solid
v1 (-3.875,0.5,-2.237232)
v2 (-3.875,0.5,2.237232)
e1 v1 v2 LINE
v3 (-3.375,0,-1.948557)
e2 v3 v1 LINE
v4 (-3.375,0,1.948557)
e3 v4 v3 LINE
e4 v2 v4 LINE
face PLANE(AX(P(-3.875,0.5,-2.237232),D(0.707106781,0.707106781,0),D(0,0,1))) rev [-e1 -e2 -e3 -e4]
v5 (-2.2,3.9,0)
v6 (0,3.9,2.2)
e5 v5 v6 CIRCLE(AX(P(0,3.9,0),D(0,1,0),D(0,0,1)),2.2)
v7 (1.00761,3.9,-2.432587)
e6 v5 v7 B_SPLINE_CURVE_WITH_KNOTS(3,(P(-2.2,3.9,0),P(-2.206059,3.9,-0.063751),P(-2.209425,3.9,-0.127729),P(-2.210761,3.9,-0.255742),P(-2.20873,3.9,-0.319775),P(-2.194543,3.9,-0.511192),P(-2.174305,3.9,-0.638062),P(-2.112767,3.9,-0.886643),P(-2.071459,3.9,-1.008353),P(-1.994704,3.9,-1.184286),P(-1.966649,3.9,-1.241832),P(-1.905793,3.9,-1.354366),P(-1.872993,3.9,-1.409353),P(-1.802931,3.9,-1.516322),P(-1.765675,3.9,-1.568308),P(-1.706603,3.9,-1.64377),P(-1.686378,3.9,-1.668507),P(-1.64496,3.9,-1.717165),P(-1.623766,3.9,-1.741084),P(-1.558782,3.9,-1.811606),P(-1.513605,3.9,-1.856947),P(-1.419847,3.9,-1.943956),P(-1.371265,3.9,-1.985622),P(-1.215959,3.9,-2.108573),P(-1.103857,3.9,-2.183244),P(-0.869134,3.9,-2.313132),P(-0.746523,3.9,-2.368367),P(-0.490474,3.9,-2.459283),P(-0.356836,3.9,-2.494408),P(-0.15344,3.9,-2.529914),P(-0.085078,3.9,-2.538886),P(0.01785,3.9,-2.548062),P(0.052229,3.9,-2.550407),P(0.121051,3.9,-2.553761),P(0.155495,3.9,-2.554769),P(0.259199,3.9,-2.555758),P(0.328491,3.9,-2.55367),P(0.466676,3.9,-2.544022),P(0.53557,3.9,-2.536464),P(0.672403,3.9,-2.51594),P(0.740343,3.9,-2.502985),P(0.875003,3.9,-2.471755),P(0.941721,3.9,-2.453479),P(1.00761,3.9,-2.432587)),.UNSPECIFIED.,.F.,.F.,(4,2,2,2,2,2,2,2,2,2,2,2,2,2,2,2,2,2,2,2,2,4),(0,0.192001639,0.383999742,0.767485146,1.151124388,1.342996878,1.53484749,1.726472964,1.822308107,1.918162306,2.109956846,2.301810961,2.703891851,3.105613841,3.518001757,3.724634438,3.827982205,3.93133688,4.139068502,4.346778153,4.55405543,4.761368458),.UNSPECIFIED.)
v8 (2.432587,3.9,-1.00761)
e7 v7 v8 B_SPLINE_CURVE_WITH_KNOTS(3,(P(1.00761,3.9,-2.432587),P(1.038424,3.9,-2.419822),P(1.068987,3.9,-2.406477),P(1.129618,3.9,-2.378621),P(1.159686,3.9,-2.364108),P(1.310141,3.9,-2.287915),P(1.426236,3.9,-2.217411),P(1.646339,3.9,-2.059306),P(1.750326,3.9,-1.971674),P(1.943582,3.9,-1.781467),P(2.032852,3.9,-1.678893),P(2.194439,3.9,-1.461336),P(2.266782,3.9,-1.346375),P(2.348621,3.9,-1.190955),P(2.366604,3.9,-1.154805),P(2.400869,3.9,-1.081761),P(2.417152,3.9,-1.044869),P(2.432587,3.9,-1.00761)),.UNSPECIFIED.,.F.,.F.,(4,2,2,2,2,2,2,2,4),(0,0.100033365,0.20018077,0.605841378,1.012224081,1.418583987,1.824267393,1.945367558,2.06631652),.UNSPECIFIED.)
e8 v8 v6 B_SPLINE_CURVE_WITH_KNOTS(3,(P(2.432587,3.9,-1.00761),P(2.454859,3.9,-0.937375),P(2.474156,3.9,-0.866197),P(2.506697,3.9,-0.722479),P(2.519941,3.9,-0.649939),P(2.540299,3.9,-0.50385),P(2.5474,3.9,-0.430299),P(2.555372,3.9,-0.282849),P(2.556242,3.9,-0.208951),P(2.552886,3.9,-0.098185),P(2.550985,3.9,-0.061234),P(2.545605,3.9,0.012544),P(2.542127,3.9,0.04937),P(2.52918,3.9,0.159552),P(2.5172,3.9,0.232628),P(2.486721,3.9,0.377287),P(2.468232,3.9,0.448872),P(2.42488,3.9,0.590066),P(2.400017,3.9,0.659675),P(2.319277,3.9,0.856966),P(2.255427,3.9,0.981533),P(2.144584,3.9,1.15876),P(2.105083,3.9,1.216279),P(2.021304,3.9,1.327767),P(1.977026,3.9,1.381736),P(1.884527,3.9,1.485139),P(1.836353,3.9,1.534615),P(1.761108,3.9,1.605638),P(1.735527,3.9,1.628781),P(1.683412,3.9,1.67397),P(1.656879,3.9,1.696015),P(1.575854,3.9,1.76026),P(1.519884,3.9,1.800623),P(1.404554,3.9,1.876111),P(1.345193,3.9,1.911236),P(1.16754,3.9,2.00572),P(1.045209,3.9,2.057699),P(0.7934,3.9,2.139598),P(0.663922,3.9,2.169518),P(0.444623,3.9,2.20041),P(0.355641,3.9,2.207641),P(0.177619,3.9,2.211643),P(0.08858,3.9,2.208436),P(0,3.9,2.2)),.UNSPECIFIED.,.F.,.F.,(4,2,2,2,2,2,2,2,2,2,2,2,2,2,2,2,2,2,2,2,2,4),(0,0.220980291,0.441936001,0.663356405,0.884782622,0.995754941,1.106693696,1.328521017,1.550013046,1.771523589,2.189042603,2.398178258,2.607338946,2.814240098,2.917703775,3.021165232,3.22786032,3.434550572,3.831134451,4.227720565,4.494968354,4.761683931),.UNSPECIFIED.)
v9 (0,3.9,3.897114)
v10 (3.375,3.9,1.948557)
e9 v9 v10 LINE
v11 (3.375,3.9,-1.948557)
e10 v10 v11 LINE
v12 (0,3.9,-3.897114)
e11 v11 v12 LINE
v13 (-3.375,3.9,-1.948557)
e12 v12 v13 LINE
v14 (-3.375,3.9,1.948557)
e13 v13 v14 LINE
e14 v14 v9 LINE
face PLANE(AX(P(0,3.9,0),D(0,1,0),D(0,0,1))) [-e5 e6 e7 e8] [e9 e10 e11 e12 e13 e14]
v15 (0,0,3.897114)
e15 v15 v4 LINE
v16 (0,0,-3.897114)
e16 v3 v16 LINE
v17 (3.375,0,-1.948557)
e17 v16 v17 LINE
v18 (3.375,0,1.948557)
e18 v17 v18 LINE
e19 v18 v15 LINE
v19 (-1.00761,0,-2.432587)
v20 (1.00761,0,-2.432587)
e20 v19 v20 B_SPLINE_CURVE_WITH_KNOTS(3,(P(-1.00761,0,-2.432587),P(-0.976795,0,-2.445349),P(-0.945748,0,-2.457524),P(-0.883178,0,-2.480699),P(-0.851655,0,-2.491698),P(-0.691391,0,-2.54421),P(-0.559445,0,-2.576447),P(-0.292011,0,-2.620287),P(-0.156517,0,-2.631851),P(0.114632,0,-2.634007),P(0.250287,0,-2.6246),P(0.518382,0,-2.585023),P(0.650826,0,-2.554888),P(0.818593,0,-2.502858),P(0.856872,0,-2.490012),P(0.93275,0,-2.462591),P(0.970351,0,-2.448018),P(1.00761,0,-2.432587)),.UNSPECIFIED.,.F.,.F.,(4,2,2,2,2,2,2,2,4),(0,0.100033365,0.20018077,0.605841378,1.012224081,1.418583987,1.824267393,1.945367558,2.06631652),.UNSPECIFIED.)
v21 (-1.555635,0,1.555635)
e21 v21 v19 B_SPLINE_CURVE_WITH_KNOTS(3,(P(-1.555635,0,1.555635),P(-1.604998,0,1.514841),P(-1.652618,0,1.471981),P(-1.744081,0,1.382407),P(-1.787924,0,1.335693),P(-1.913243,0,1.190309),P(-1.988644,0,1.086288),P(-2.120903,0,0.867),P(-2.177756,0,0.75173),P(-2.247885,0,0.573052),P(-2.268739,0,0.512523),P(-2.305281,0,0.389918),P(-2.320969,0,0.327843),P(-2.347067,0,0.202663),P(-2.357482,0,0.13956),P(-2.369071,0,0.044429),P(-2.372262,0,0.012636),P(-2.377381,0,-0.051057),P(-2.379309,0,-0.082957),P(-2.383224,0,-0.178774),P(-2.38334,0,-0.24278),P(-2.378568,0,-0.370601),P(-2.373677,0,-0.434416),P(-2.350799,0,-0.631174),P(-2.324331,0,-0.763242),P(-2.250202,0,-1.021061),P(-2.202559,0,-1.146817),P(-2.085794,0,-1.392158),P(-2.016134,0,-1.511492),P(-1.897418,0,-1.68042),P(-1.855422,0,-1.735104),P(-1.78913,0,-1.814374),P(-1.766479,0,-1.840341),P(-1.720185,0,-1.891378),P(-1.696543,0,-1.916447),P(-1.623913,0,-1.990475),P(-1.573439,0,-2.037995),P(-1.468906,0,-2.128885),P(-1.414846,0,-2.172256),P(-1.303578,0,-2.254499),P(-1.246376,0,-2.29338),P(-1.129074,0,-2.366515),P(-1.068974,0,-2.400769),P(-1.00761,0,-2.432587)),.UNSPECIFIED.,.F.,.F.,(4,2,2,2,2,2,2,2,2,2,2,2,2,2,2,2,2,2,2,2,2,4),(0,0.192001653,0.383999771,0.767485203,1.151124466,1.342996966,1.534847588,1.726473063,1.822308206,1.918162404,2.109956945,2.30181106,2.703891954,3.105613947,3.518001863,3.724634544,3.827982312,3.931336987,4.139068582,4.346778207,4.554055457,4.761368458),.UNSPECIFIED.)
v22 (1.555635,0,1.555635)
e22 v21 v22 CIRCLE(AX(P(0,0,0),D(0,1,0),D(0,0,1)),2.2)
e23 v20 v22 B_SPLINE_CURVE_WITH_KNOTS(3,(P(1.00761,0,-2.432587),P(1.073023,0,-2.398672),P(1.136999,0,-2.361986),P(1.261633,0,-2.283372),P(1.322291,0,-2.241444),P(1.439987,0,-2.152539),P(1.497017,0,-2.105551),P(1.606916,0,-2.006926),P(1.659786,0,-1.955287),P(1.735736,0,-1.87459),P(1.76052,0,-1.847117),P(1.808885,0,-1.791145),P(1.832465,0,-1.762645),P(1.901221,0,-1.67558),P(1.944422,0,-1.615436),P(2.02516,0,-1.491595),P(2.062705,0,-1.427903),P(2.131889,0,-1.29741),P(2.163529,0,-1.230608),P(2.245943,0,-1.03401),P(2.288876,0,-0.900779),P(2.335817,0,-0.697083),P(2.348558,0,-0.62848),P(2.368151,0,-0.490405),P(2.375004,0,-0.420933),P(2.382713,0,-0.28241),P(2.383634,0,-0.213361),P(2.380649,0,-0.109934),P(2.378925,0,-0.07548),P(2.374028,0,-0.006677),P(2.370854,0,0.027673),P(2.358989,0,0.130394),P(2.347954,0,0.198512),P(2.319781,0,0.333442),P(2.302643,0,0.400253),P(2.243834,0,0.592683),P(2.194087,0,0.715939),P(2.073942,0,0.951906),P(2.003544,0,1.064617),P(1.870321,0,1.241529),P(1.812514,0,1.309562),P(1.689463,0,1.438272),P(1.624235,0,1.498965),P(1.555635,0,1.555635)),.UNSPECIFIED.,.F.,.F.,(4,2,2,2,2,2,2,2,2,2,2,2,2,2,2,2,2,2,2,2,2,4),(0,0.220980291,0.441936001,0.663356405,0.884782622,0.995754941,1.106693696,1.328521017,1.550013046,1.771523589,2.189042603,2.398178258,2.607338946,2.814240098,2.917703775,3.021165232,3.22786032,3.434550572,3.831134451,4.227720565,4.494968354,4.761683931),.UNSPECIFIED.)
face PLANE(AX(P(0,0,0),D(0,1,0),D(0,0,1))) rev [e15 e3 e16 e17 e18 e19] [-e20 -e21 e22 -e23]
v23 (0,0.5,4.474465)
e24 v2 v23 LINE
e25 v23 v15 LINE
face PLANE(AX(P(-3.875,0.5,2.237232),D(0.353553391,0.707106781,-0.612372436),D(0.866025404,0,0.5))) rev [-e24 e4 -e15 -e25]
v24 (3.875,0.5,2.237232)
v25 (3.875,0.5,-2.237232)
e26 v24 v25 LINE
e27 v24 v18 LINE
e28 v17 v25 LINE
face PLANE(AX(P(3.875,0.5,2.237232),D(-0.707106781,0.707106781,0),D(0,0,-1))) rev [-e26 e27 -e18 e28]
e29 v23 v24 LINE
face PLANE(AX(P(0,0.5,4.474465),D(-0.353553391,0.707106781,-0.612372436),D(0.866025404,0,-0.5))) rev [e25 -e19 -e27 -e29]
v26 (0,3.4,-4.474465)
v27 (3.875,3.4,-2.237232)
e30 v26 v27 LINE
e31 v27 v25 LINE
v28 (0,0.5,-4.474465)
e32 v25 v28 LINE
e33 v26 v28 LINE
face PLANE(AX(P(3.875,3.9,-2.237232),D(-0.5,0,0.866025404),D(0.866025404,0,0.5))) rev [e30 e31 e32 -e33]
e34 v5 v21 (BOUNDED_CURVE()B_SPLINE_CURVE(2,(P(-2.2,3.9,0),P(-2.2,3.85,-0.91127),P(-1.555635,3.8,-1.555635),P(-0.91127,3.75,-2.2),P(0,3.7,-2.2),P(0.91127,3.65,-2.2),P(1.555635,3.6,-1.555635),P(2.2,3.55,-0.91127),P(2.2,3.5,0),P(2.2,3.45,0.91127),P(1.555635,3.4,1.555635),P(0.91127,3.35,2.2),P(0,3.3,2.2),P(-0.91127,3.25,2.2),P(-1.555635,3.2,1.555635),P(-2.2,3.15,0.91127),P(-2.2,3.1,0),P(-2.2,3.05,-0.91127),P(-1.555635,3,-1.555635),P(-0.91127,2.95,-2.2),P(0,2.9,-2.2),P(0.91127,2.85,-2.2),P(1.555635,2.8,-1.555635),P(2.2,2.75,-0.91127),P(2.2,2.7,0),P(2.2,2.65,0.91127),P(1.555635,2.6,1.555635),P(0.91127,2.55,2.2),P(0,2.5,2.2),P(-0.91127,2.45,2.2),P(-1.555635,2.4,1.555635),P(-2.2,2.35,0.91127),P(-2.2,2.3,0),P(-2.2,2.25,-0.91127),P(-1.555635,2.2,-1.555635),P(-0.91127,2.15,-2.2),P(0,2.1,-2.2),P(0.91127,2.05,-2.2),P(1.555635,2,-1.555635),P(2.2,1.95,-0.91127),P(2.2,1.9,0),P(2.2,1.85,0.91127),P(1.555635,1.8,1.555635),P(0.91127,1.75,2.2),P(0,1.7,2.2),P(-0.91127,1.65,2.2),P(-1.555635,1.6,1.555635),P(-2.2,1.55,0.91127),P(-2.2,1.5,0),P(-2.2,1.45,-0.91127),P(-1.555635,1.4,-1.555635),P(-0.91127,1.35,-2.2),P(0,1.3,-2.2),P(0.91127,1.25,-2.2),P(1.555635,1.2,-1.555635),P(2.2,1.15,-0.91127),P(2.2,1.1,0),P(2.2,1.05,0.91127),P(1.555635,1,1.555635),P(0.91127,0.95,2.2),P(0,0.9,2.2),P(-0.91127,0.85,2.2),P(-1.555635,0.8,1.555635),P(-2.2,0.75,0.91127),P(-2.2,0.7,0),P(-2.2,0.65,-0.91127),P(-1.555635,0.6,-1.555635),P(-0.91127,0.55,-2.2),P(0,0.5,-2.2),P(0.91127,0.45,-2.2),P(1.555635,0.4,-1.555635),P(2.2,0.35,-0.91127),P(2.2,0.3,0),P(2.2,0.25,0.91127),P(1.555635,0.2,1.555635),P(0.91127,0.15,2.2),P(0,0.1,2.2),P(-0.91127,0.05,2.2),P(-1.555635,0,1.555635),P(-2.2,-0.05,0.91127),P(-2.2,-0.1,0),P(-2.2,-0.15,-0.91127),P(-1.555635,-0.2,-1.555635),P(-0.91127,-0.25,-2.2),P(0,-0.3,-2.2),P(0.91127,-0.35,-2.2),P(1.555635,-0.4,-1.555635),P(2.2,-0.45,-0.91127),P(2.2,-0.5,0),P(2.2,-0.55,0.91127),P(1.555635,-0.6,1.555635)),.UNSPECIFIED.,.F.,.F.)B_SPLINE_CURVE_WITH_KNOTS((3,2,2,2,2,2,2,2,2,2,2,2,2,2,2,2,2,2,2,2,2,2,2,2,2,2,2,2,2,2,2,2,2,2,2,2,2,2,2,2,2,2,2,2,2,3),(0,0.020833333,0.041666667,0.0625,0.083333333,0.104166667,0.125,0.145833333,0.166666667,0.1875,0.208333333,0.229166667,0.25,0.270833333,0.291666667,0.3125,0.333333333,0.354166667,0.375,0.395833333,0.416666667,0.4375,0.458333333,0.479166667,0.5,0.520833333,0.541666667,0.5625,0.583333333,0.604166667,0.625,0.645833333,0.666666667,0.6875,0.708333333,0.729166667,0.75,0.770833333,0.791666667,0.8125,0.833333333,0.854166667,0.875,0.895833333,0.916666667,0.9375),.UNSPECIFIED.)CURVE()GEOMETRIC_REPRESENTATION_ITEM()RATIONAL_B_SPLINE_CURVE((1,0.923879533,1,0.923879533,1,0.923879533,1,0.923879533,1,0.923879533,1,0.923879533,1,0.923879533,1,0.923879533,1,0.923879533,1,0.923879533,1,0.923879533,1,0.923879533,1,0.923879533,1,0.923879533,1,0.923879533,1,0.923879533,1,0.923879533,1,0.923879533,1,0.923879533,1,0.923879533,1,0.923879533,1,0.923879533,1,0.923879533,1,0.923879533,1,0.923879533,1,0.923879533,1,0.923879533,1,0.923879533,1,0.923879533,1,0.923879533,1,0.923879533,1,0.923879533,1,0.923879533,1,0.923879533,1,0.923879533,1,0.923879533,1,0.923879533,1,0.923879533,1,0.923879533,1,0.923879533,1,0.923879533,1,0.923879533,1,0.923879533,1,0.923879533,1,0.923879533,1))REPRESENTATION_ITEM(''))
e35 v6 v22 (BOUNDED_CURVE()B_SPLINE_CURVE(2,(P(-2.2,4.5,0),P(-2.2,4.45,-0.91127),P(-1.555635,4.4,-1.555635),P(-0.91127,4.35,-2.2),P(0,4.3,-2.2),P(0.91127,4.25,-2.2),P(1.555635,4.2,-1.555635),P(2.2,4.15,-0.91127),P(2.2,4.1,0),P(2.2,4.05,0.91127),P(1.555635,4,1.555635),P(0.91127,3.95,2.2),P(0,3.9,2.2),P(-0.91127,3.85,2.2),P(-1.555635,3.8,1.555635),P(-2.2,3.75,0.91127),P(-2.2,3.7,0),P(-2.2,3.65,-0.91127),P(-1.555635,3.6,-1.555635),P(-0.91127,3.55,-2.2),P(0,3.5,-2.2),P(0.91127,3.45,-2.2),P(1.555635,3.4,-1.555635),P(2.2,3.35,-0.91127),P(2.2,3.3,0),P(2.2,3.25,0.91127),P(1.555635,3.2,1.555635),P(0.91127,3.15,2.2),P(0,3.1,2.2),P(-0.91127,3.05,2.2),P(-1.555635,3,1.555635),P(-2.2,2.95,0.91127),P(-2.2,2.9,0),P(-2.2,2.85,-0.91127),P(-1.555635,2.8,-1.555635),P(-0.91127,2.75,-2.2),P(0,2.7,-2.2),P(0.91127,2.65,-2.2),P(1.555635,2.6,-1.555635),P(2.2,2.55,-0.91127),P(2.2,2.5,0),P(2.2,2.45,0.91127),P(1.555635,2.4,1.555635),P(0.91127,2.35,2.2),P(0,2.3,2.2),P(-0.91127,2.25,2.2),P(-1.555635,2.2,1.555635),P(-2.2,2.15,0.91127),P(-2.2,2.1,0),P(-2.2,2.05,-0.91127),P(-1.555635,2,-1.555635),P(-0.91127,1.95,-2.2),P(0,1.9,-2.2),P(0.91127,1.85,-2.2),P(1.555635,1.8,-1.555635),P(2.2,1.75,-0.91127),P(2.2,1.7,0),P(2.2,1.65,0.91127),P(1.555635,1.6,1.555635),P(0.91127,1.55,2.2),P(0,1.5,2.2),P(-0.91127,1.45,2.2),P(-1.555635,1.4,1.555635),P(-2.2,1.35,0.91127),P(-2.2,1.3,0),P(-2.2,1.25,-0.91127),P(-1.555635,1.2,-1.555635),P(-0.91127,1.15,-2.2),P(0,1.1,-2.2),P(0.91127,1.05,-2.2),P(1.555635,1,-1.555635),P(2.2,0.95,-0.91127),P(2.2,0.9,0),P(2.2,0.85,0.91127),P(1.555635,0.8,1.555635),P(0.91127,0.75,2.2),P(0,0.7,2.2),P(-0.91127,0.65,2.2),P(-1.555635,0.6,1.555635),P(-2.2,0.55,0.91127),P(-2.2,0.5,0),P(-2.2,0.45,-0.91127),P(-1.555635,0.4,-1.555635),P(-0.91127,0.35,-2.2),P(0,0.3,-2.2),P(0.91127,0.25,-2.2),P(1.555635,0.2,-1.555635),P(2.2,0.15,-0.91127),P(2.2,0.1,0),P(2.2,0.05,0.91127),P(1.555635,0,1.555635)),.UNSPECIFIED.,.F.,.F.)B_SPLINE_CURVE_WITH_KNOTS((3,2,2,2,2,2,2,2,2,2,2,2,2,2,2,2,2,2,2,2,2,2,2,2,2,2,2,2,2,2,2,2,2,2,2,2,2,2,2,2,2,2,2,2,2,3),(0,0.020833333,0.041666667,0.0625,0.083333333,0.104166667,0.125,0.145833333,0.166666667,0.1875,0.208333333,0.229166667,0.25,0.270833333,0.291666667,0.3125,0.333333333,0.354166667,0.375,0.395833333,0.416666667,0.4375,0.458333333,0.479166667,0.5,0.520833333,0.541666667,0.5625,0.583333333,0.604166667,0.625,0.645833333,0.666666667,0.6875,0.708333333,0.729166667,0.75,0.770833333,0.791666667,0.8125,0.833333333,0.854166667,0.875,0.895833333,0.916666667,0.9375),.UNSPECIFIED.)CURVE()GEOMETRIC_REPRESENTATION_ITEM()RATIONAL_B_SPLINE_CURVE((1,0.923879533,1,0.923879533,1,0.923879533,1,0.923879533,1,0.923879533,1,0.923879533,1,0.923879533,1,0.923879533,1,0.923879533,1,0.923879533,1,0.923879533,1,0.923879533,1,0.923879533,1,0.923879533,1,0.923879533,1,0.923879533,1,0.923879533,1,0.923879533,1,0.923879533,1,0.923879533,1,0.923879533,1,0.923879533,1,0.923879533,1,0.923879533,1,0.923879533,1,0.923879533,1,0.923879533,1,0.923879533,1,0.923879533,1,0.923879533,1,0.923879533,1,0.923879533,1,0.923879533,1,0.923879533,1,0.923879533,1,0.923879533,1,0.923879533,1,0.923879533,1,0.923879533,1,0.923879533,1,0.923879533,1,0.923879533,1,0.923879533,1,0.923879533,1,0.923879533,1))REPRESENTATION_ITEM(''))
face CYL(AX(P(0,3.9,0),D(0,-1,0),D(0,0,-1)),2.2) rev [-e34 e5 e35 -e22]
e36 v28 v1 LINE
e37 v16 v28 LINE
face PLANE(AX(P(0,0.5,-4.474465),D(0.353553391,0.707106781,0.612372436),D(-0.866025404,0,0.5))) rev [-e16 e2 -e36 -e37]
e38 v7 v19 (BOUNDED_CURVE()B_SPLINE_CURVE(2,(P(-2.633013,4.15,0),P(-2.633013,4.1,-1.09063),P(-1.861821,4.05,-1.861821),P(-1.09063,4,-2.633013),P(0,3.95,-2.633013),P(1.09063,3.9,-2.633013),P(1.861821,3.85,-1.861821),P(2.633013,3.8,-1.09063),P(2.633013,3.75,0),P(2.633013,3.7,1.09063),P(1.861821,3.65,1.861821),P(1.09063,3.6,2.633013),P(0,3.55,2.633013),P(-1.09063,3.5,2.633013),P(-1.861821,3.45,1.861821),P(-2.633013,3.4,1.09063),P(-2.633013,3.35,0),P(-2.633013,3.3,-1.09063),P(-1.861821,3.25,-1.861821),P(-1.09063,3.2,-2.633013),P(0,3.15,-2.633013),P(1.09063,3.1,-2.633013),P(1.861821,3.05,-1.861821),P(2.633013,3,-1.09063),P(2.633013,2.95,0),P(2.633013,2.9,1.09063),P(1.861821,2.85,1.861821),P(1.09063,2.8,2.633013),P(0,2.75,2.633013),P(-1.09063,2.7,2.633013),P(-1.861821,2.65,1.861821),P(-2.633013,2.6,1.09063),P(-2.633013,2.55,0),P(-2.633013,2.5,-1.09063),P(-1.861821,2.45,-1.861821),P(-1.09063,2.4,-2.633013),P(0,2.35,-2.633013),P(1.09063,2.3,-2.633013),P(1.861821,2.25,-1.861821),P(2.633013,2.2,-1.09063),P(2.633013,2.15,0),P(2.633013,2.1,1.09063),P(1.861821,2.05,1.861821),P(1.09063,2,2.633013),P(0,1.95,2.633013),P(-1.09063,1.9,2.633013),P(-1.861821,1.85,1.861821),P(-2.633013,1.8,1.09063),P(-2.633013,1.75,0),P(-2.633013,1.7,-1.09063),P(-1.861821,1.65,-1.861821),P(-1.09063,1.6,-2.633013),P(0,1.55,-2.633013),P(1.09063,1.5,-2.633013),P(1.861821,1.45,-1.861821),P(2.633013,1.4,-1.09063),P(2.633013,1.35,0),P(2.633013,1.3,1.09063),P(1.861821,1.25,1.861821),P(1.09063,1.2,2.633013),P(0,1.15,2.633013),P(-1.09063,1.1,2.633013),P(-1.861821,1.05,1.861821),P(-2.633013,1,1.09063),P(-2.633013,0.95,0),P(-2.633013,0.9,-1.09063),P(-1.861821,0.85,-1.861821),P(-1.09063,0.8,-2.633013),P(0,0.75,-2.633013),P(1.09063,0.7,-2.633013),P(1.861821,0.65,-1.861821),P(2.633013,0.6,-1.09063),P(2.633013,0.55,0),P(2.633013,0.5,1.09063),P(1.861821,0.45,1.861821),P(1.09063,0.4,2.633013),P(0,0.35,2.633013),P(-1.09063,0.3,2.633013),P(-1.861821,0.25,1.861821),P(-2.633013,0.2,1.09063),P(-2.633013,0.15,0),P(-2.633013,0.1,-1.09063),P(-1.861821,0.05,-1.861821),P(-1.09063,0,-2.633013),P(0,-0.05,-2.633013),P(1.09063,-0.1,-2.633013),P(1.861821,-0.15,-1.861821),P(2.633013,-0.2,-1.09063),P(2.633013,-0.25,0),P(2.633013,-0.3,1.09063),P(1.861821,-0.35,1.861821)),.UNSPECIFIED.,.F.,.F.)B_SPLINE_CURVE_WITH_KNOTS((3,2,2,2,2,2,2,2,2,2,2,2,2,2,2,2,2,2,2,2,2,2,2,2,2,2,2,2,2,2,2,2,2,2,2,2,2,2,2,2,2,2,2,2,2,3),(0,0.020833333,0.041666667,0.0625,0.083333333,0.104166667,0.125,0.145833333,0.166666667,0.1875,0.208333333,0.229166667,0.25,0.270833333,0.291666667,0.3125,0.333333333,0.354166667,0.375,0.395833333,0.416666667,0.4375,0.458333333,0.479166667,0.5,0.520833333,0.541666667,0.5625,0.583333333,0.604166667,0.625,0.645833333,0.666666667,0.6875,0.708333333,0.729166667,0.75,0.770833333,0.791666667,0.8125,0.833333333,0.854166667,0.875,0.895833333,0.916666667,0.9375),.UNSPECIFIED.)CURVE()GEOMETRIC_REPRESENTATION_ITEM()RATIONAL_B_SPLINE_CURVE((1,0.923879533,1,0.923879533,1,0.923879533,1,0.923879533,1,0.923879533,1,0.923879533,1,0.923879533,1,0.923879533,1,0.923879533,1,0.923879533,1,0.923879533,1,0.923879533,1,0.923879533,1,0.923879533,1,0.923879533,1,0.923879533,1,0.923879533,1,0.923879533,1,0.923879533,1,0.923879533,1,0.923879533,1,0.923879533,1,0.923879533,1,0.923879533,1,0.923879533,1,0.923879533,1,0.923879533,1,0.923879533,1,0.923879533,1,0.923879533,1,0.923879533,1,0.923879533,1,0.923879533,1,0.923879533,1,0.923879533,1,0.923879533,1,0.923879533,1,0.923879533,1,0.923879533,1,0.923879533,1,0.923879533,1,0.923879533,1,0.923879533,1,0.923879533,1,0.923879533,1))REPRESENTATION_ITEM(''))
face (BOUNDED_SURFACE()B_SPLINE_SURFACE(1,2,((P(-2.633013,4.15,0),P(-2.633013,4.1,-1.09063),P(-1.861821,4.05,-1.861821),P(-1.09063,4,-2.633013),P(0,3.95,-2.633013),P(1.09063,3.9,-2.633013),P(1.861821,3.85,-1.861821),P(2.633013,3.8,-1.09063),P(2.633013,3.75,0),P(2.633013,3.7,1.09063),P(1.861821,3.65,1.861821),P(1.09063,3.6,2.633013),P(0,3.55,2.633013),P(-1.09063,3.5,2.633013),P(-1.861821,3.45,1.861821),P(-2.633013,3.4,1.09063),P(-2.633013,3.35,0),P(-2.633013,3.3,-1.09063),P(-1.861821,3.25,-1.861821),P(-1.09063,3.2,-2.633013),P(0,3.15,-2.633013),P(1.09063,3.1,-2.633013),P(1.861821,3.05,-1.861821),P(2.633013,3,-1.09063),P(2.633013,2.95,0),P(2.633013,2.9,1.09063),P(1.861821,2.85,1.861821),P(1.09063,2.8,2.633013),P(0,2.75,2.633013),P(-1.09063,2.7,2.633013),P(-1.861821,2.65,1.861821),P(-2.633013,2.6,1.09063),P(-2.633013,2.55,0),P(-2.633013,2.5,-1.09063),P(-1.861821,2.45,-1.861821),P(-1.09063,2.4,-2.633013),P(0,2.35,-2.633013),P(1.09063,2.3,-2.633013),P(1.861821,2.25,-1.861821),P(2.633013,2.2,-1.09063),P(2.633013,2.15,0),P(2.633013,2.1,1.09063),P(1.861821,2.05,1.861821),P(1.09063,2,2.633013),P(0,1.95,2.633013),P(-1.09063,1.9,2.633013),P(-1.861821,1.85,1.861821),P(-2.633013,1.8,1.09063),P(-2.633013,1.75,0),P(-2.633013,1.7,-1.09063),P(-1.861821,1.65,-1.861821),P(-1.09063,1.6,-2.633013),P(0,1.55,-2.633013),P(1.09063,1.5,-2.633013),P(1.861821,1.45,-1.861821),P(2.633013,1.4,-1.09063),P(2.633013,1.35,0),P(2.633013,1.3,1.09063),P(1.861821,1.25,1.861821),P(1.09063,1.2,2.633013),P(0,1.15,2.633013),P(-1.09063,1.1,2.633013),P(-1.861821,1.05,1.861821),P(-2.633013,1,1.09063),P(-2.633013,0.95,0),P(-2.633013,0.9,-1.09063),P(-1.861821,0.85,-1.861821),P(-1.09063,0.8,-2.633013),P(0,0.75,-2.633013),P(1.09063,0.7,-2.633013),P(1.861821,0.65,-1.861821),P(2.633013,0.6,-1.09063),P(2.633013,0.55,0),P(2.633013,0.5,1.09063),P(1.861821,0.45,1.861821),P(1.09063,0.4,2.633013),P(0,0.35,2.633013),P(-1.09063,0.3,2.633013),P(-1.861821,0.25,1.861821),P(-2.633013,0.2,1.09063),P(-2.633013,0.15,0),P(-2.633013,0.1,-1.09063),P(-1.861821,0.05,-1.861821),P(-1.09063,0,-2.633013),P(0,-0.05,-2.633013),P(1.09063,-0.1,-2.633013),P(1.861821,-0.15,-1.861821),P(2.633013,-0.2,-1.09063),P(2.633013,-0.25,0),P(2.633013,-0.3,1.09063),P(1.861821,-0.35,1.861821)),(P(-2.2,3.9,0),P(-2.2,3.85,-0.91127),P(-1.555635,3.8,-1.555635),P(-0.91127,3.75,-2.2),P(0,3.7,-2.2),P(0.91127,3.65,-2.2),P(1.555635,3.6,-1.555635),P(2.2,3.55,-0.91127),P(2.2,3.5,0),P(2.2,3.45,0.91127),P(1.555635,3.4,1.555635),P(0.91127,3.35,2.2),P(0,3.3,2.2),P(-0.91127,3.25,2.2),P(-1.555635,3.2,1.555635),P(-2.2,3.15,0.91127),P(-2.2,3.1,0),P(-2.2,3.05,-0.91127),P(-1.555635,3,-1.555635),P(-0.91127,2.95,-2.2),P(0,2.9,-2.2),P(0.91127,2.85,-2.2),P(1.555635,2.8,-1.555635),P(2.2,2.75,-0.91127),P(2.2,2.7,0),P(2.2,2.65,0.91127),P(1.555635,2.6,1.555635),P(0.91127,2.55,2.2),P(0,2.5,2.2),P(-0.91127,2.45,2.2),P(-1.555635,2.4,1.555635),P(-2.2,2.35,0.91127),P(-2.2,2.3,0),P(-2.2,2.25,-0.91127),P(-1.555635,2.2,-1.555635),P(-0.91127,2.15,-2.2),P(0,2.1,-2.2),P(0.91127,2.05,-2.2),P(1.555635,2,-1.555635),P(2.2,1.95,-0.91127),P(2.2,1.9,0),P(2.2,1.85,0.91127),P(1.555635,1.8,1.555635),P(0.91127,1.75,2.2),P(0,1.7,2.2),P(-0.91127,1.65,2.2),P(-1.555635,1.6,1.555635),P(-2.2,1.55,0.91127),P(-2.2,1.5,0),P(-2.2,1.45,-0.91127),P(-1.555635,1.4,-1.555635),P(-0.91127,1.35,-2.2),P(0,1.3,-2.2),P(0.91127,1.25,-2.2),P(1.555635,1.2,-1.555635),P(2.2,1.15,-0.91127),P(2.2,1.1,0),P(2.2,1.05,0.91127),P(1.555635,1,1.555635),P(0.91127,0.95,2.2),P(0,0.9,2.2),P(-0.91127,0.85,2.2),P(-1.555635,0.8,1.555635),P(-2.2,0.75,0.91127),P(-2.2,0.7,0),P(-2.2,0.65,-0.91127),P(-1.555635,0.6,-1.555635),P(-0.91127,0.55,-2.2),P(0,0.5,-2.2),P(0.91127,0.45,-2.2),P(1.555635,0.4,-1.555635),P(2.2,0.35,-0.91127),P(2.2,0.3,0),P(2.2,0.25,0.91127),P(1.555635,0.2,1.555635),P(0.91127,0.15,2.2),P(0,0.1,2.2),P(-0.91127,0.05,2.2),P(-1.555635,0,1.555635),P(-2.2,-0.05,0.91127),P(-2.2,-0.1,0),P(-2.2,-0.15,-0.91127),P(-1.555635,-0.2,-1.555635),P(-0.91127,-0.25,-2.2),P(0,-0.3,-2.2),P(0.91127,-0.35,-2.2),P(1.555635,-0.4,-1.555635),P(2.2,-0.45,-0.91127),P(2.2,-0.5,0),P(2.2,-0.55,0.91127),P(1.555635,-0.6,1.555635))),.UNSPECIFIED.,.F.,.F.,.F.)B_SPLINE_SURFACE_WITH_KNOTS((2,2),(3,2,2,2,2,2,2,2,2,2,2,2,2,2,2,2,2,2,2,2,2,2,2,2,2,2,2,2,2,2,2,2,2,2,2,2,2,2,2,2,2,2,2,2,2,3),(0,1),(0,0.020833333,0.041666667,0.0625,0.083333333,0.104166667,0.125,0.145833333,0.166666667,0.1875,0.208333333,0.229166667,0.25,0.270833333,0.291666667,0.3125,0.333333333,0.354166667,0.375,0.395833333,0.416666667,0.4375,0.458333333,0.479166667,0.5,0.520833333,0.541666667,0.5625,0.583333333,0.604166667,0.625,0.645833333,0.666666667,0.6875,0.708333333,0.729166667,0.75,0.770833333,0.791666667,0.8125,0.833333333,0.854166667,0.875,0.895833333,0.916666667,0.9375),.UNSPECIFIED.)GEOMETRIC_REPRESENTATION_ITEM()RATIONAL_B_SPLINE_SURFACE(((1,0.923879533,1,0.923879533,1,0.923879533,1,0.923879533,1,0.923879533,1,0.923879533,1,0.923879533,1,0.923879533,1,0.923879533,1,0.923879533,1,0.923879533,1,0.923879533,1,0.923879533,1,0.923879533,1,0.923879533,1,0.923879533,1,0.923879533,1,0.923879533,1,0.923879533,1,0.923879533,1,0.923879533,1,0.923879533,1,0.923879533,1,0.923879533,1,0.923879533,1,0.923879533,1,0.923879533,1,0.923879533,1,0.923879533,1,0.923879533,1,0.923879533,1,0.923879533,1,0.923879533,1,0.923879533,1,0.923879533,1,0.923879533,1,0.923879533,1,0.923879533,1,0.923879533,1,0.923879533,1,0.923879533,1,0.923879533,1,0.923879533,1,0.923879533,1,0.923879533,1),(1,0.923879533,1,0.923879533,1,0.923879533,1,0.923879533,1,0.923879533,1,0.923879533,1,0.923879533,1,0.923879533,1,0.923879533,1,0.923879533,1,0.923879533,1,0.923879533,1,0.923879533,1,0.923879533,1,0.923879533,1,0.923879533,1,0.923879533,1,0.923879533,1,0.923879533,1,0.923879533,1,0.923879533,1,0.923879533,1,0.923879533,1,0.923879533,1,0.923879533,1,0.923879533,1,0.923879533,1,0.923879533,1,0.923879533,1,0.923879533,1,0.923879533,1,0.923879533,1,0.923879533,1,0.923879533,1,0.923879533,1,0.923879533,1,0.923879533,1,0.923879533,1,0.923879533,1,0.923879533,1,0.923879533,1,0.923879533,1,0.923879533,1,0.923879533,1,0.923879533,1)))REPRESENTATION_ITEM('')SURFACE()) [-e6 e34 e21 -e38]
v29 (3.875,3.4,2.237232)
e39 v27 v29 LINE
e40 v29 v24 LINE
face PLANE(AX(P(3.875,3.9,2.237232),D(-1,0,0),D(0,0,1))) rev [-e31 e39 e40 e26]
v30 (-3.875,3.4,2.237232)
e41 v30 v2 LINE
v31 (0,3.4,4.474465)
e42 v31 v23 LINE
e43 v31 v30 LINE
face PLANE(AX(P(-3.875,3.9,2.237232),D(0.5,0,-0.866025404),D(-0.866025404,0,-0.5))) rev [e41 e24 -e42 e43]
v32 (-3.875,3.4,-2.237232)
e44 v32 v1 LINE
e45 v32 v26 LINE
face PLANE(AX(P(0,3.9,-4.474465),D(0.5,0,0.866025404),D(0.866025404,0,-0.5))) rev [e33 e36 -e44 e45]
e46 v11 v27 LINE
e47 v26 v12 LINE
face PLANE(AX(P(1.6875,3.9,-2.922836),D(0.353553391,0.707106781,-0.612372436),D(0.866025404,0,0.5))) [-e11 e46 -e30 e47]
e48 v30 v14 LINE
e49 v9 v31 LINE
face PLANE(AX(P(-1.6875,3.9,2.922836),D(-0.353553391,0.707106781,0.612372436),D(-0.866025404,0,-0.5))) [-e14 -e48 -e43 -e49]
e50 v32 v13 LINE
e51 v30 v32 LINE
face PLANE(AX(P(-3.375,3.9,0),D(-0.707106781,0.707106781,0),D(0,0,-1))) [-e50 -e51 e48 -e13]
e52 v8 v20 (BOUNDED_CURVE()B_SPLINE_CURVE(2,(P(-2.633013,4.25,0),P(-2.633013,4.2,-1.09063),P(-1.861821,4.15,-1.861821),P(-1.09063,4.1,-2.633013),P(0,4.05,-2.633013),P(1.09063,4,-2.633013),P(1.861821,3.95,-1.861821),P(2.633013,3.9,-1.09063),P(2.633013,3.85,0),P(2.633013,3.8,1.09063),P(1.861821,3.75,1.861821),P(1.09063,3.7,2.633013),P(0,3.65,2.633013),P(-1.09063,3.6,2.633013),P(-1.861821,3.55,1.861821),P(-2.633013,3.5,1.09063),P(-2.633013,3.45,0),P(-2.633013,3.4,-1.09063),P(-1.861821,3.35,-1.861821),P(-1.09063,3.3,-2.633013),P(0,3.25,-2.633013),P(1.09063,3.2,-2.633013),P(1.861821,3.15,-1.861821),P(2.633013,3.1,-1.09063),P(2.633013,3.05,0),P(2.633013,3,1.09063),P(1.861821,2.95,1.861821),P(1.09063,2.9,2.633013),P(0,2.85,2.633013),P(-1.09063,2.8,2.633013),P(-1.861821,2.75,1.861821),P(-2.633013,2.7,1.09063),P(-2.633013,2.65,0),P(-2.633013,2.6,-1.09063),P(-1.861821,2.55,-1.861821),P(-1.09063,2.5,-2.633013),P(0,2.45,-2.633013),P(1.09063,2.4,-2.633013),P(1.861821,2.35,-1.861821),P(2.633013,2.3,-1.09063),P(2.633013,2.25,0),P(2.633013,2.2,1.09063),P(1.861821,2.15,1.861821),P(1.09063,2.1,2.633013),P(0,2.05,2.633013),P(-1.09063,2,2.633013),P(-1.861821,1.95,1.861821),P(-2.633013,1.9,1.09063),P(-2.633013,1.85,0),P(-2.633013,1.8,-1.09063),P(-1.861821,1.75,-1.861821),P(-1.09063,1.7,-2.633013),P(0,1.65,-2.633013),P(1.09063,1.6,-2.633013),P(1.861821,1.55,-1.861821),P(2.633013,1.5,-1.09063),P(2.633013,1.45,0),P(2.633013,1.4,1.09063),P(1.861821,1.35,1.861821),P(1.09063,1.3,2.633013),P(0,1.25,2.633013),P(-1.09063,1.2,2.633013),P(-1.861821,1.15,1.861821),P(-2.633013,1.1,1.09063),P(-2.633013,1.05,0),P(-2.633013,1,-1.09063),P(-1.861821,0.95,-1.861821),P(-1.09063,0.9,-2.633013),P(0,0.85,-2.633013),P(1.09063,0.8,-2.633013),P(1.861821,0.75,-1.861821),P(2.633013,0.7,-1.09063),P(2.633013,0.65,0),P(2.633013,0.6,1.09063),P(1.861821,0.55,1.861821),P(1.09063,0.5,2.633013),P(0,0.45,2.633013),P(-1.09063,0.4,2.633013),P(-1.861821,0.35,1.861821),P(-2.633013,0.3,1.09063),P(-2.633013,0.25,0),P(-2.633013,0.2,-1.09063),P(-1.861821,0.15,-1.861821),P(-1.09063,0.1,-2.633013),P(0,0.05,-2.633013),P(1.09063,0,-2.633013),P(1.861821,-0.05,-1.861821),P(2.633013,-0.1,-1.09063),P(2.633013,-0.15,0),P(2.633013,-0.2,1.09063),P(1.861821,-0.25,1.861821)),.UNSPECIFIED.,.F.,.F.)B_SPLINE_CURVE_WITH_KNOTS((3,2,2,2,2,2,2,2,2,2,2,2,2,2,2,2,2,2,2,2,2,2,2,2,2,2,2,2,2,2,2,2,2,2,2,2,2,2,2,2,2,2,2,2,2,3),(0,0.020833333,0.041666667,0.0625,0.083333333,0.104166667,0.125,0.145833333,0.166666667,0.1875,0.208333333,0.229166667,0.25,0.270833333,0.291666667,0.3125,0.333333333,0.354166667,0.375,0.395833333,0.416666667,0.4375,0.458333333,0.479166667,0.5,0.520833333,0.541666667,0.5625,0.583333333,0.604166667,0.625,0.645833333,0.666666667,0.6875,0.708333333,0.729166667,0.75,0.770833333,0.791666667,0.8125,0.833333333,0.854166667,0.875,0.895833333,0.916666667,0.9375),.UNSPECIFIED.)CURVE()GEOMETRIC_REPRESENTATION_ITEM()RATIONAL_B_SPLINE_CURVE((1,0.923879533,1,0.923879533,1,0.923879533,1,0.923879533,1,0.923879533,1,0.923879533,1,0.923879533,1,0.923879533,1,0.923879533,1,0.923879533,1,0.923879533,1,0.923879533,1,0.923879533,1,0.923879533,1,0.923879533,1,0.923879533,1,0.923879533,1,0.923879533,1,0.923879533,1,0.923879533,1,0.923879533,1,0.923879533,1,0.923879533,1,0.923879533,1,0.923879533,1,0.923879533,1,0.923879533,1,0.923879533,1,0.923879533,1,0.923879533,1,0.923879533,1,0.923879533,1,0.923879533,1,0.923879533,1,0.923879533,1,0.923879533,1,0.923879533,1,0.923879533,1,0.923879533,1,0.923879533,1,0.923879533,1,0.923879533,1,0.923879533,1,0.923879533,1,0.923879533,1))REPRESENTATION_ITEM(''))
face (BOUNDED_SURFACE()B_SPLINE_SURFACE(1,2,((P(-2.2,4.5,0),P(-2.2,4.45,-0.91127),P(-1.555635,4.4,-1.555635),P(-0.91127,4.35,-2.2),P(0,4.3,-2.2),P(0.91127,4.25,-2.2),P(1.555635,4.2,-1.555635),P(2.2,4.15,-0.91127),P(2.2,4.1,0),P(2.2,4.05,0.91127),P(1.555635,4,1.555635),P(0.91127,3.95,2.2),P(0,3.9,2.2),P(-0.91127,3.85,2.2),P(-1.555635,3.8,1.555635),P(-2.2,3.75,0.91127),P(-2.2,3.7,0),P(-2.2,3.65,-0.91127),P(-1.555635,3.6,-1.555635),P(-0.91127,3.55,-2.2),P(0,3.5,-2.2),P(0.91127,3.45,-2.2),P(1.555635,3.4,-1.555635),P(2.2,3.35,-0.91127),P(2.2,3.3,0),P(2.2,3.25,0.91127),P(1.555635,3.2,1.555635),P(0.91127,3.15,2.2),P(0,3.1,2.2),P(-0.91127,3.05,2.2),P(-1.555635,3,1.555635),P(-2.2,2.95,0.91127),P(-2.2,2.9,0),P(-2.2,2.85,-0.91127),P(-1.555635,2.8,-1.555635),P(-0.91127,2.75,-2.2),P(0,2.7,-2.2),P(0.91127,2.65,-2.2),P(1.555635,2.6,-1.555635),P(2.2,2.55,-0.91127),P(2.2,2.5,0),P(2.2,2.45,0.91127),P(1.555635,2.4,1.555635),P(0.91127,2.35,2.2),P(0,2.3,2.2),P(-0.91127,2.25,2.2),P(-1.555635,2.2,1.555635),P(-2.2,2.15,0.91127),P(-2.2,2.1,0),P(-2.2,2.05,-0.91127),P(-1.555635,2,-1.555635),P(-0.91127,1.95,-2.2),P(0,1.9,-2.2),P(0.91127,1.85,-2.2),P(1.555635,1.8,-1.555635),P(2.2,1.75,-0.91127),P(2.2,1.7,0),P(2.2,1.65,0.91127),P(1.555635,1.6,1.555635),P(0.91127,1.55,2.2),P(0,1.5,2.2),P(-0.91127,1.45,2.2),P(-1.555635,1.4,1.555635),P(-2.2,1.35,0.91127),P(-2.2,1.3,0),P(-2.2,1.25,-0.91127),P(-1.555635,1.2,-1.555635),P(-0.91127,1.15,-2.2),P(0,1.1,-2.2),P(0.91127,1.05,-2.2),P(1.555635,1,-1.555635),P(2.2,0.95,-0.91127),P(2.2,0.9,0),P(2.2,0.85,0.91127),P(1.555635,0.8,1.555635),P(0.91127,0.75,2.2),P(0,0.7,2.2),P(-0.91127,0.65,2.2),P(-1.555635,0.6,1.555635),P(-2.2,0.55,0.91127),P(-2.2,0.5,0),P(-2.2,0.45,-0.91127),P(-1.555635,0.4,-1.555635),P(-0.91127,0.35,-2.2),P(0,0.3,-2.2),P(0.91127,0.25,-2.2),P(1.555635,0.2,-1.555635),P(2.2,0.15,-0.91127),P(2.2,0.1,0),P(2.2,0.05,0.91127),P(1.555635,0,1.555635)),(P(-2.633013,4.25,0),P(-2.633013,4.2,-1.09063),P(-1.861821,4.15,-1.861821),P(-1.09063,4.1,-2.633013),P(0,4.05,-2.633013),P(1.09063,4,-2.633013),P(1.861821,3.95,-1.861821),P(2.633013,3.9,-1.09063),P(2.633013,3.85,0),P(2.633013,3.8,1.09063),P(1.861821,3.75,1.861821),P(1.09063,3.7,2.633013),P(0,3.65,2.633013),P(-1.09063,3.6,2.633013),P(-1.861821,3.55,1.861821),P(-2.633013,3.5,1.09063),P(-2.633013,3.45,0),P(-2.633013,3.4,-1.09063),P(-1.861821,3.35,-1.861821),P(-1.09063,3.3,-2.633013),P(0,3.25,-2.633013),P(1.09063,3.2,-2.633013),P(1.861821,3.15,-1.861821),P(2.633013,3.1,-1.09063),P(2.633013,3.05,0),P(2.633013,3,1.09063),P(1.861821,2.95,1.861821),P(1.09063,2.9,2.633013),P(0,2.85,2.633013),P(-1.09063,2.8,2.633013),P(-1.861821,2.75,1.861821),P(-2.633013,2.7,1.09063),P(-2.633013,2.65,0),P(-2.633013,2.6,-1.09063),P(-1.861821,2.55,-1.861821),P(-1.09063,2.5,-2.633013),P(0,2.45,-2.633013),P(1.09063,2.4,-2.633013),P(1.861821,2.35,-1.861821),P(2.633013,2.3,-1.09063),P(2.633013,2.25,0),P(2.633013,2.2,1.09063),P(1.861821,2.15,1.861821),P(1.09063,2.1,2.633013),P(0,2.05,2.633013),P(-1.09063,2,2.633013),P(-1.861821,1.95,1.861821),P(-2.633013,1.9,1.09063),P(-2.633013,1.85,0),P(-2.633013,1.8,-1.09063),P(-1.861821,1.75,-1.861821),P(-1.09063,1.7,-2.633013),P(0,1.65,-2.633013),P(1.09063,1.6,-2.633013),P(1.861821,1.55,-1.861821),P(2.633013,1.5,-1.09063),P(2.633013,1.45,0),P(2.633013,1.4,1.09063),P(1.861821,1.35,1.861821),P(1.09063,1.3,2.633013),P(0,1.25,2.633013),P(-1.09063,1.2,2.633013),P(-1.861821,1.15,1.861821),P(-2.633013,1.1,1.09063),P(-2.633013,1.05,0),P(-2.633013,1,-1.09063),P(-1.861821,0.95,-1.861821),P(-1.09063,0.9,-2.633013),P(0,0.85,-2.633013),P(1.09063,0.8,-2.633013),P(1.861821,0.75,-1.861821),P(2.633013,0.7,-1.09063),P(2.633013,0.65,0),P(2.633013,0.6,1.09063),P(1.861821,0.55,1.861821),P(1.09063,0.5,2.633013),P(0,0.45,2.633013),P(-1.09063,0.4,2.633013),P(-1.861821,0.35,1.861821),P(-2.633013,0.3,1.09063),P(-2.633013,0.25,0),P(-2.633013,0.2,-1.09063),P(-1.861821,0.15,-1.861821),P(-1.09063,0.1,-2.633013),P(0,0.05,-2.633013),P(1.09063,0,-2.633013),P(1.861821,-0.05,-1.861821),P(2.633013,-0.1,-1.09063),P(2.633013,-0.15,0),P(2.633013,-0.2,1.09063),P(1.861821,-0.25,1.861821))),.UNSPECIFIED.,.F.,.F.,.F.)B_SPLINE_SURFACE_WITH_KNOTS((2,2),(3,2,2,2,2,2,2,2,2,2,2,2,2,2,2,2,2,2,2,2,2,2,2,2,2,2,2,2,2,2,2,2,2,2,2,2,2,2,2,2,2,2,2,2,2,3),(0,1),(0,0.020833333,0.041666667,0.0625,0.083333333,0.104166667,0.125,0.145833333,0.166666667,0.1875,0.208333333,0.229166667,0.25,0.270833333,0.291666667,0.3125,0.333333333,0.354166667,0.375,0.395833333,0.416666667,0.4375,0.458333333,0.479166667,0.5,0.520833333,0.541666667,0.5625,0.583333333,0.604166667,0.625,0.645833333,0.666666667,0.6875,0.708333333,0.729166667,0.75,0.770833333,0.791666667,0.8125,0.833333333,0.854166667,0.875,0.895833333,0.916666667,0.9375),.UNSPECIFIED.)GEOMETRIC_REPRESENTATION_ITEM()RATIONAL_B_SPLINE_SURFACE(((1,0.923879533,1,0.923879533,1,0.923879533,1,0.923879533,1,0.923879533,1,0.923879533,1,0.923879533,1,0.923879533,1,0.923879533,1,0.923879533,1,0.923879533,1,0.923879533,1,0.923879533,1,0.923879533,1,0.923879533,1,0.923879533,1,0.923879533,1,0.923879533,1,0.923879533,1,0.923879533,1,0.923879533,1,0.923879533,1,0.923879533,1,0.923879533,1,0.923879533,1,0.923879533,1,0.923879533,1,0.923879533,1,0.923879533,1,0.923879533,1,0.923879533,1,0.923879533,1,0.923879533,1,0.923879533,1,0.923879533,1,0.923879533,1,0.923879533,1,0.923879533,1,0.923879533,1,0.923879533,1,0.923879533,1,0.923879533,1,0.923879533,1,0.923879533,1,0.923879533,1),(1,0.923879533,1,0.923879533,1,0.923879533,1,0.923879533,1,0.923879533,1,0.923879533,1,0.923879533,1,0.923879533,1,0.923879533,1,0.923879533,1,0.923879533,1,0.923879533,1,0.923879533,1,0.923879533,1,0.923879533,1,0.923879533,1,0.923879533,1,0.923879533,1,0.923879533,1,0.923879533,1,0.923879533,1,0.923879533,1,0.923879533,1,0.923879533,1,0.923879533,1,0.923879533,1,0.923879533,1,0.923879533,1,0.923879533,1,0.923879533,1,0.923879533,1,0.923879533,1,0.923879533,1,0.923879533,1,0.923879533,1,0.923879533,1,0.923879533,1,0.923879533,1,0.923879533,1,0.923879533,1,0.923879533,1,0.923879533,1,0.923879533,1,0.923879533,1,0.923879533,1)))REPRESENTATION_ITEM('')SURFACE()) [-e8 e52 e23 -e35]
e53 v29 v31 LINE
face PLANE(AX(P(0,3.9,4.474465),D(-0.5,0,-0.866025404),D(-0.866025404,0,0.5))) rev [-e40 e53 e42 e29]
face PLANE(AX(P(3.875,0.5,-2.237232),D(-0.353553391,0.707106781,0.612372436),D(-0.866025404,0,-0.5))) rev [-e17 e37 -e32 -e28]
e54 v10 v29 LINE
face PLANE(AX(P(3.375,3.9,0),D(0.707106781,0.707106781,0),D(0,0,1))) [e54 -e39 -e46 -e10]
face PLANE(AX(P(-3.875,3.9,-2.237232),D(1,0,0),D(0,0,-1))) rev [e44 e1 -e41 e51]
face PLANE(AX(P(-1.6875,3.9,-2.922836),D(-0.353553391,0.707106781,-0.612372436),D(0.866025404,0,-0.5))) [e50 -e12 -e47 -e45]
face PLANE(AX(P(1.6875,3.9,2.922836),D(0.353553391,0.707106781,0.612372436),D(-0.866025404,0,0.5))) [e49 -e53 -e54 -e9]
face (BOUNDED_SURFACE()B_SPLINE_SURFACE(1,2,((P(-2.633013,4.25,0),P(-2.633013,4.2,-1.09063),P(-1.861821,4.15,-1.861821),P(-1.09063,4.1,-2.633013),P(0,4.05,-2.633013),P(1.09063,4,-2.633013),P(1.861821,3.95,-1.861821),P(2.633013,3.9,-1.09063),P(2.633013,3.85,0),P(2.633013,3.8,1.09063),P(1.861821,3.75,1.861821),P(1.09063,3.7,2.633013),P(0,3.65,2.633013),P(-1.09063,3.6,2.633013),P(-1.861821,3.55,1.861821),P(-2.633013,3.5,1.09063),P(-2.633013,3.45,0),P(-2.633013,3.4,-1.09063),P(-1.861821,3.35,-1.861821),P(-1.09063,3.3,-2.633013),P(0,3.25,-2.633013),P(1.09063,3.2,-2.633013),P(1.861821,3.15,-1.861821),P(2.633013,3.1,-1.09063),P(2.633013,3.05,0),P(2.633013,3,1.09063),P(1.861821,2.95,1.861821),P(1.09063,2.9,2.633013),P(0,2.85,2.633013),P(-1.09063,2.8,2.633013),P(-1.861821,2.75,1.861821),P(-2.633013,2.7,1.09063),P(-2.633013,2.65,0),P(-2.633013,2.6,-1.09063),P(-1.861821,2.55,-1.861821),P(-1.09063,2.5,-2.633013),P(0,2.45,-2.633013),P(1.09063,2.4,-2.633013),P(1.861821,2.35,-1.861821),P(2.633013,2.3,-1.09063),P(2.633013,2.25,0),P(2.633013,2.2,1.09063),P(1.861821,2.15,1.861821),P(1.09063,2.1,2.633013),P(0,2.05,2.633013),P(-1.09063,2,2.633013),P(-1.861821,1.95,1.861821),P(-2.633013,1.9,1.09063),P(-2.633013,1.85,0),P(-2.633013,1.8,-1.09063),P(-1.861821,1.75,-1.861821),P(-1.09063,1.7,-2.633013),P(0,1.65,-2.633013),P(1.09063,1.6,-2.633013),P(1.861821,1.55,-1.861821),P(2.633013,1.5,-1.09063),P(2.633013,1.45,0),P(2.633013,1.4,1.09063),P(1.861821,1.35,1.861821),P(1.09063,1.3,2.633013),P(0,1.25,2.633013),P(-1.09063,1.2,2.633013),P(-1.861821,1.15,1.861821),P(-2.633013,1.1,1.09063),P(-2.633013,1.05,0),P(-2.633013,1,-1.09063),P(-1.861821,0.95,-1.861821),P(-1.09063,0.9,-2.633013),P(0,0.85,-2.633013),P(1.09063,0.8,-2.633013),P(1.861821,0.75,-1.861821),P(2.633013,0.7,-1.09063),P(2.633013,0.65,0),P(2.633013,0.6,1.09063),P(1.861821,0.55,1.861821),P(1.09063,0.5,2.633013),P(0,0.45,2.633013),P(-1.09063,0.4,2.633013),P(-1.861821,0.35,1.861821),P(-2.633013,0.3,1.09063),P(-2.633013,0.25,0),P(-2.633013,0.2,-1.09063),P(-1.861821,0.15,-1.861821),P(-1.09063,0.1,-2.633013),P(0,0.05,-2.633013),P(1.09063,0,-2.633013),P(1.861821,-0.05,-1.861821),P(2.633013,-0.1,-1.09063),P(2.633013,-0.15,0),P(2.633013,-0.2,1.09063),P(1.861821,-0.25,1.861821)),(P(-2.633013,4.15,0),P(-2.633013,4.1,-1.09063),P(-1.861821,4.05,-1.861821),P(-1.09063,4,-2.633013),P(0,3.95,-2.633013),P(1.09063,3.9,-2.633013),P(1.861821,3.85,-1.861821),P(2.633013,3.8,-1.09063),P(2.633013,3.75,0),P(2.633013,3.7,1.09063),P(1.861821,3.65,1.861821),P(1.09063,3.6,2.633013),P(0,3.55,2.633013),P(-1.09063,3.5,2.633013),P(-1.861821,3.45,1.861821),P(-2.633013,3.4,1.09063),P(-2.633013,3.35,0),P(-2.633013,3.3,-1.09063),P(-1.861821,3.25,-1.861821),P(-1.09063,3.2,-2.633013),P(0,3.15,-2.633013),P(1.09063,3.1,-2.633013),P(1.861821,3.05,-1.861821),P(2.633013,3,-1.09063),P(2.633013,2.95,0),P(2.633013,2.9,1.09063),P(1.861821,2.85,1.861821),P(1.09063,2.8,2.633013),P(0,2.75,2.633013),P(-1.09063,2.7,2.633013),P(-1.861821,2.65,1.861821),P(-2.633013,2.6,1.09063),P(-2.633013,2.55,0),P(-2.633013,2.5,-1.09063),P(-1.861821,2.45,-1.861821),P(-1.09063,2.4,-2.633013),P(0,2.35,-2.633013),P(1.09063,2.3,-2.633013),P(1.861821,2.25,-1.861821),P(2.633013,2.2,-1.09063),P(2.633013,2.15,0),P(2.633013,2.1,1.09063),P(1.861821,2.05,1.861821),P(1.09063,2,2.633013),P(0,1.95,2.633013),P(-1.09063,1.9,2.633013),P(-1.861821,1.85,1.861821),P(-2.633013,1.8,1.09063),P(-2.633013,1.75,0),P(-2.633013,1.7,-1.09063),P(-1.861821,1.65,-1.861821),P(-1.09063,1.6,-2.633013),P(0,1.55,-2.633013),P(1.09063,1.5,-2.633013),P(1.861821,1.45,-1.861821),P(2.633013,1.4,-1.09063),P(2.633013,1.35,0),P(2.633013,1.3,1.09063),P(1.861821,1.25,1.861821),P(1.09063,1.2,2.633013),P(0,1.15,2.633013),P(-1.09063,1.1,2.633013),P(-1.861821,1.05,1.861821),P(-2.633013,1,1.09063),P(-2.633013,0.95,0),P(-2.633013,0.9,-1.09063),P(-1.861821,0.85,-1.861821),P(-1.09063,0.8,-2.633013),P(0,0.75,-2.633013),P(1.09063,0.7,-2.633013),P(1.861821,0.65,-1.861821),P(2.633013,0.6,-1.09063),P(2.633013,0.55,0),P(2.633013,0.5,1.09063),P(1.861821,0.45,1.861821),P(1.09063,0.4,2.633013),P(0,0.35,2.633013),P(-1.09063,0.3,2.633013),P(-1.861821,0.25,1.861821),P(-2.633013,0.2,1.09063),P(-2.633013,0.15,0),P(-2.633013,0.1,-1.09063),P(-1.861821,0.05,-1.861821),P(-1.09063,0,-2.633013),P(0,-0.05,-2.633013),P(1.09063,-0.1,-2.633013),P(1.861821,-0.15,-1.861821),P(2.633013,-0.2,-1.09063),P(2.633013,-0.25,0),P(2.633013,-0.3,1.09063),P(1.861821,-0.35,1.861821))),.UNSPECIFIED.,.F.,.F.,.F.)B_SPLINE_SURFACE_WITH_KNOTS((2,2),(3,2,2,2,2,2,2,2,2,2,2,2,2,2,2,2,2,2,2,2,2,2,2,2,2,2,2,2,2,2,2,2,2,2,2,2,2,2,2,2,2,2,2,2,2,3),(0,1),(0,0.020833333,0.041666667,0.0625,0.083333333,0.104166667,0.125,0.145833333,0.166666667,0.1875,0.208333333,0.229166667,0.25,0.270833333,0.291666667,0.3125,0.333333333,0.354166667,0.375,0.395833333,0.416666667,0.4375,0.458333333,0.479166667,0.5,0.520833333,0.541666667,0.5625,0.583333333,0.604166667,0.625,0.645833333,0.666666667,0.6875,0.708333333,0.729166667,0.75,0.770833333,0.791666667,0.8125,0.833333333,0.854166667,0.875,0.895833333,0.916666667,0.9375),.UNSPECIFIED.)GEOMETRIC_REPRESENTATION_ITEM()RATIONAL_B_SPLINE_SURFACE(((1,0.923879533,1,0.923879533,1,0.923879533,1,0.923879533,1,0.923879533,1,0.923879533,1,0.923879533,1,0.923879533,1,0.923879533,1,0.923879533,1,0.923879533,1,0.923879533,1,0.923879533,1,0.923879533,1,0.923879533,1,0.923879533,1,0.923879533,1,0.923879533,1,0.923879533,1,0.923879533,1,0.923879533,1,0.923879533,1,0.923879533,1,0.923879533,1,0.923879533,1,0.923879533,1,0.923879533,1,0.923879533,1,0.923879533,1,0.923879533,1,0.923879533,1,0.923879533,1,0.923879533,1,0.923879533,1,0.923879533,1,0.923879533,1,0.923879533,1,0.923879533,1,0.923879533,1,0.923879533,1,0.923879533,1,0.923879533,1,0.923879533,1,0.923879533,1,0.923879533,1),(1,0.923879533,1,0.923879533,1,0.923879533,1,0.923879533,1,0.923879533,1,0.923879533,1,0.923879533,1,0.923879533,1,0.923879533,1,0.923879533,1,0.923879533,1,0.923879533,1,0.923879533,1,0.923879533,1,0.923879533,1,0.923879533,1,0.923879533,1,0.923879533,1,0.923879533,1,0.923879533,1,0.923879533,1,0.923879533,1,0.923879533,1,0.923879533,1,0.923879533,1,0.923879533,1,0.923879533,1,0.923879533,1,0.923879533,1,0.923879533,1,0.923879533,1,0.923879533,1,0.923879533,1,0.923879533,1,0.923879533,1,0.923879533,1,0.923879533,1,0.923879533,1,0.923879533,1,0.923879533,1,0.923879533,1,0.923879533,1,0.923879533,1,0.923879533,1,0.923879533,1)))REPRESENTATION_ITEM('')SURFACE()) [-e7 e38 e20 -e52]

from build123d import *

# Parameters (mm, degrees)
SKETCH1_R           = 2.2
BOSS_EXTRUDE1_DEPTH = 3.9
THREAD1_PITCH       = 0.8
CHAMFER1_SIZE       = 0.5


with BuildPart() as part:
    # Sketch1 → Boss-Extrude1 (new body)
    with BuildSketch(Plane(origin=(0, 0, 0), x_dir=(1, 0, 0), z_dir=(0, 1, 0))):
        Polygon((0, -4.474464586), (3.875, -2.237232293), (3.875, 2.237232293), (0, 4.474464586), (-3.875, 2.237232293), (-3.875, -2.237232293), align=None)
        with Locations(Location((0, 0, 0), (0, 0, 270))):
            Circle(SKETCH1_R, mode=Mode.SUBTRACT)
    extrude(amount=BOSS_EXTRUDE1_DEPTH)

    # Thread1: the profile of Thread Profile1 profile screwed along a right-hand helix of 5.625 turns, 8 arcs to a turn; built about Z, then put on its axis
    thread1_z = Axis((0, 0, 0), (0, 0, 1))
    thread1_corners = [(2.1997, 0, -0.000173205), (2.6330127, 0, 0.249999999), (2.6330127, 0, 0.349999999), (2.1997, 0, 0.600173203)]
    with BuildLine(mode=Mode.PRIVATE) as thread1_profile:
        Line(thread1_corners[0], thread1_corners[1])
        Line(thread1_corners[1], thread1_corners[2])
        Line(thread1_corners[2], thread1_corners[3])
        Line(thread1_corners[3], thread1_corners[0])
    thread1_cap = Face(thread1_profile.wire())
    thread1_turn_angles = [0, 22.5, 45, 67.5, 90, 112.5, 135, 157.5, 180, 202.5, 225, 247.5, 270, 292.5, 315, 337.5, 360]
    thread1_turn_weights = [1, 0.9238795325112867, 1, 0.9238795325112867, 1, 0.9238795325112867, 1, 0.9238795325112867, 1, 0.9238795325112867, 1, 0.9238795325112867, 1, 0.9238795325112867, 1, 0.9238795325112867, 1]
    thread1_turn_rails = [Edge.make_bspline([Vector(p[0], p[1], 0).rotate(thread1_z, thread1_turn_angles[k]) / thread1_turn_weights[k] + Vector(0, 0, p[2] + THREAD1_PITCH * thread1_turn_angles[k] / 360) for k in range(17)], [0, 0, 0, 1, 1, 2, 2, 3, 3, 4, 4, 5, 5, 6, 6, 7, 7, 8, 8, 8], 2, thread1_turn_weights) for p in thread1_corners]
    thread1_turn_sides = [Face.make_surface_from_curves(thread1_turn_rails[p[0]], thread1_turn_rails[p[1]]) for p in [(0, 1), (1, 2), (2, 3), (3, 0)]]
    thread1_last_angles = [1800, 1822.5, 1845, 1867.5, 1890, 1912.5, 1935, 1957.5, 1980, 2002.5, 2025]
    thread1_last_weights = [1, 0.9238795325112867, 1, 0.9238795325112867, 1, 0.9238795325112867, 1, 0.9238795325112867, 1, 0.9238795325112867, 1]
    thread1_last_rails = [Edge.make_bspline([Vector(p[0], p[1], 0).rotate(thread1_z, thread1_last_angles[k]) / thread1_last_weights[k] + Vector(0, 0, p[2] + THREAD1_PITCH * thread1_last_angles[k] / 360) for k in range(11)], [0, 0, 0, 1, 1, 2, 2, 3, 3, 4, 4, 5, 5, 5], 2, thread1_last_weights) for p in thread1_corners]
    thread1_last_sides = [Face.make_surface_from_curves(thread1_last_rails[p[0]], thread1_last_rails[p[1]]) for p in [(0, 1), (1, 2), (2, 3), (3, 0)]]
    thread1 = Plane(origin=(0, 4.5, 0), x_dir=(-1, 0, 0), z_dir=(0, -1, 0)) * Solid(Shell([*[p.moved(Location((0, 0, THREAD1_PITCH * i))) for i in range(5) for p in thread1_turn_sides], *thread1_last_sides, thread1_cap, thread1_cap.rotate(thread1_z, 2025).moved(Location((0, 0, THREAD1_PITCH * 2025 / 360)))]))
    add(thread1, mode=Mode.SUBTRACT)

    # Chamfer1
    chamfer1_edges = [part.edges().sort_by_distance(p)[0] for p in [
        (3.875, 3.9, 0),
        (1.9375, 3.9, -3.35584844),
        (-1.9375, 3.9, -3.35584844),
        (-3.875, 3.9, 0),
        (-1.9375, 3.9, 3.35584844),
        (-3.875, 0, 0),
        (-1.9375, 0, -3.35584844),
        (1.9375, 0, -3.35584844),
        (1.9375, 3.9, 3.35584844),
        (3.875, 0, 0),
        (1.9375, 0, 3.35584844),
        (-1.9375, 0, 3.35584844),
    ]]
    chamfer(chamfer1_edges, length=CHAMFER1_SIZE)


solid = part.part
